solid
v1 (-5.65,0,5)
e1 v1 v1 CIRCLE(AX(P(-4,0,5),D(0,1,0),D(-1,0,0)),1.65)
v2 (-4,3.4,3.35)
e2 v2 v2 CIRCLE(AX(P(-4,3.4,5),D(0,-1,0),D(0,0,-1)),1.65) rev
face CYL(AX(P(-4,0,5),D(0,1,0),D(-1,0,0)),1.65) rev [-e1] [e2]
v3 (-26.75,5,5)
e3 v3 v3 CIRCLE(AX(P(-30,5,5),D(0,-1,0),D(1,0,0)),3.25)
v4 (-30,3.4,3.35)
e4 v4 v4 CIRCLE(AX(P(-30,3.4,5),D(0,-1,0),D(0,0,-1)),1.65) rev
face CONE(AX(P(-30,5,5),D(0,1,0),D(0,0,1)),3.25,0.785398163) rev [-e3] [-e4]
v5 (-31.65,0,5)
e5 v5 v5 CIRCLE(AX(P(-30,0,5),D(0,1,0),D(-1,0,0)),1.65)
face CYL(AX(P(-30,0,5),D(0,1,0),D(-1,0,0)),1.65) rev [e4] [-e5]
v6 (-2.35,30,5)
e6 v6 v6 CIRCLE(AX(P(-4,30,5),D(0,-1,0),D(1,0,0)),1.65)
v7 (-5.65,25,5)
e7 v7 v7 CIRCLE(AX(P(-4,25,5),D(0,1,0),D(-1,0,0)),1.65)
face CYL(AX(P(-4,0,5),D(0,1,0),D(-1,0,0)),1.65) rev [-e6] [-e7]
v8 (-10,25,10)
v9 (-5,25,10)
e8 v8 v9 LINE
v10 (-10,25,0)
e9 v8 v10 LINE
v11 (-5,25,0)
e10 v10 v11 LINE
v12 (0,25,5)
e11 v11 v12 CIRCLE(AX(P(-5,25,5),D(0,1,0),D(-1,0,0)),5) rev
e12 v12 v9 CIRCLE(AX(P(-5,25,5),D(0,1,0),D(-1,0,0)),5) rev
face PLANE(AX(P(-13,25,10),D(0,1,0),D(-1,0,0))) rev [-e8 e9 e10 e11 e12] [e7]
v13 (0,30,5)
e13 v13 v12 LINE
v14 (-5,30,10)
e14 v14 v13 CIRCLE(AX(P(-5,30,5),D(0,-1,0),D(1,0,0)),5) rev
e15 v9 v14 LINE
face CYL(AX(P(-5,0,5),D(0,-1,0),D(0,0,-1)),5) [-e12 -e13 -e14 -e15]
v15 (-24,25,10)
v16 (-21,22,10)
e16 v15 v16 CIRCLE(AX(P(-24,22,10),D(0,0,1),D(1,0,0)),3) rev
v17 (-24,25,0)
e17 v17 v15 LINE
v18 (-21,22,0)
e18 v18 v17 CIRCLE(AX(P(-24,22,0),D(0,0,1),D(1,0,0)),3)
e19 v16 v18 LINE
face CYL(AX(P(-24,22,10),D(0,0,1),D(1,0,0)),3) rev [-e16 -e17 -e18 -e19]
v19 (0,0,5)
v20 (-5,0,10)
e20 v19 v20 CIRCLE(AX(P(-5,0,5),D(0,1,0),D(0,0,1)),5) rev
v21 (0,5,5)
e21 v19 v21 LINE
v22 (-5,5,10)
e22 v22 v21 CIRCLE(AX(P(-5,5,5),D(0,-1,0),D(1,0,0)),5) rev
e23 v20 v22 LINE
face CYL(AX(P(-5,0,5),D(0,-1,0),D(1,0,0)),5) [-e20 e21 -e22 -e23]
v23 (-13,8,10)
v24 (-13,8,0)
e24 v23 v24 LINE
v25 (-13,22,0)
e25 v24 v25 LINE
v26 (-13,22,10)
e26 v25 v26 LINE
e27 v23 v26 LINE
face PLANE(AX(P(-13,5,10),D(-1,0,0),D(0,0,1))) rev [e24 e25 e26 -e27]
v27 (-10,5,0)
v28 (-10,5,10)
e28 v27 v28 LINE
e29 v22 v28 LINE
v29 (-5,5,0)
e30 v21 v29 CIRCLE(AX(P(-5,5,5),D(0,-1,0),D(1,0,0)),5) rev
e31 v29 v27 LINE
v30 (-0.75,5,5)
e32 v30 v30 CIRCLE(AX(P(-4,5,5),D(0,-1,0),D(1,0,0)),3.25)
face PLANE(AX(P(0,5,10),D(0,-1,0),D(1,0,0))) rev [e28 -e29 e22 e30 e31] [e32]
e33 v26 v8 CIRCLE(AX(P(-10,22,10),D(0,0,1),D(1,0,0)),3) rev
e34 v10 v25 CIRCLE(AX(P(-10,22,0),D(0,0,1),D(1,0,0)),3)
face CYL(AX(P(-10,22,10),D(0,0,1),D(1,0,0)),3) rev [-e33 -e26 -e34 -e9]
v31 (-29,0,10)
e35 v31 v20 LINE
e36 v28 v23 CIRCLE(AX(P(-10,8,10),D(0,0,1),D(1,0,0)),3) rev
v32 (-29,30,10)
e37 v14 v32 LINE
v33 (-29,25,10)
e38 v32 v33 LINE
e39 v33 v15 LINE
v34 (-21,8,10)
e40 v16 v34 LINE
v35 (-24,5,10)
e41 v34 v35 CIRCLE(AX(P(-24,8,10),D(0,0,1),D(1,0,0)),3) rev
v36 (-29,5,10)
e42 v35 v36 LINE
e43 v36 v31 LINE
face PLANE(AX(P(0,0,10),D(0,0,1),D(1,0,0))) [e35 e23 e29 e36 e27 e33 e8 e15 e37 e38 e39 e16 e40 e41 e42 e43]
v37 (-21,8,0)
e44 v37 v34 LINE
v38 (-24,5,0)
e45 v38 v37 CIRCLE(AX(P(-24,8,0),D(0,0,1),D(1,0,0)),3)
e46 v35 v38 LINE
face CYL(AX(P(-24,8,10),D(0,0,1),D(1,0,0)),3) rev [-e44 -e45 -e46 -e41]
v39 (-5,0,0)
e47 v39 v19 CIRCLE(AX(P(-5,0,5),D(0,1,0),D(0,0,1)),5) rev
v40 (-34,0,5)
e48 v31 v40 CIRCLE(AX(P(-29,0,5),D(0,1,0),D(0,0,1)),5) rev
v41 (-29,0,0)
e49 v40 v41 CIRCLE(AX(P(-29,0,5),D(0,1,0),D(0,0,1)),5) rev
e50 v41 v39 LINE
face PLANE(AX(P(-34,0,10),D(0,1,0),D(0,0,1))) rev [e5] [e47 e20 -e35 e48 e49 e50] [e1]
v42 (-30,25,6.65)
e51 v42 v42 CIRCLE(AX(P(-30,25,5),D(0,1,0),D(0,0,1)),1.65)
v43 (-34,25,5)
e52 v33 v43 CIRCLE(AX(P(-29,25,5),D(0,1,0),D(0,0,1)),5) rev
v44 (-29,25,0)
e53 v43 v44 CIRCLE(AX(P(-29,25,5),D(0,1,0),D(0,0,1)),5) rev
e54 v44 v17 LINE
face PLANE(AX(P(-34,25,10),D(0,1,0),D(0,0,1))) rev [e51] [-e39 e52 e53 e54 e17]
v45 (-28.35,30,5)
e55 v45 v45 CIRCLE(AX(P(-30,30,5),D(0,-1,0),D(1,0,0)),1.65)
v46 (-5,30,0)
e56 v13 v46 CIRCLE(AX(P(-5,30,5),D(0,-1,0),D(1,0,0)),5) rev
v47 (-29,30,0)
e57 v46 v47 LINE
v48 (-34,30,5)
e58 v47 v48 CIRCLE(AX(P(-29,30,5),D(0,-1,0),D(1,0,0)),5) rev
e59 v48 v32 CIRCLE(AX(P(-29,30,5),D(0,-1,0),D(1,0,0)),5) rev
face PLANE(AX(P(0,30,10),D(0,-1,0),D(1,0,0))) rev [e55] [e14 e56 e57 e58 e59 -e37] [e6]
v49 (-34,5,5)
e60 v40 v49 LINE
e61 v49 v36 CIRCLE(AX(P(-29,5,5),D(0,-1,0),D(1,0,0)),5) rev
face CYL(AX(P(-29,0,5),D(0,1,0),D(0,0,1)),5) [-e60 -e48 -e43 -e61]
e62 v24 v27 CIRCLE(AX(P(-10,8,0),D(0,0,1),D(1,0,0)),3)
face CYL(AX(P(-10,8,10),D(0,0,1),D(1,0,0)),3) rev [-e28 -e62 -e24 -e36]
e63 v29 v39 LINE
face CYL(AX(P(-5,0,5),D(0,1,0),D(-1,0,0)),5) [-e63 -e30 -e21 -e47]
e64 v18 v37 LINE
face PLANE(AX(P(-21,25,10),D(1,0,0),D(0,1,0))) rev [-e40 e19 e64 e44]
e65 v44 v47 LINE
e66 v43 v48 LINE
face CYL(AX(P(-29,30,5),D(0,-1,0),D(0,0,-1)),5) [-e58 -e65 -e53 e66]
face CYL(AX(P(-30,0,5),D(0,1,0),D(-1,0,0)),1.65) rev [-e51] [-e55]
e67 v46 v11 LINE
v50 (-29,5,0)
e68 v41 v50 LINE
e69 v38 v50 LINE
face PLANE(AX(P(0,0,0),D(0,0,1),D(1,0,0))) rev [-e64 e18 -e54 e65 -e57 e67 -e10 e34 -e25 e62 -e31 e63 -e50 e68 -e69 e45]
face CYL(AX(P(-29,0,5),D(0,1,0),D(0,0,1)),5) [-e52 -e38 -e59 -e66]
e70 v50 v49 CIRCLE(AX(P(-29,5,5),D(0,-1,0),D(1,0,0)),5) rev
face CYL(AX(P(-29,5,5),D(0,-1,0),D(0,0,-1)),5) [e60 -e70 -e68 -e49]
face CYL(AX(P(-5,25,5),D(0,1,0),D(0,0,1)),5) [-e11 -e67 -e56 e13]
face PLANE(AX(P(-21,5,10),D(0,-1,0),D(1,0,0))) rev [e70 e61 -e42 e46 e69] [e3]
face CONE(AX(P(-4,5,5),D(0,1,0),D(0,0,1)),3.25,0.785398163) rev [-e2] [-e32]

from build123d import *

# Parameters (mm, degrees)
BOSS_EXTRUDE1_DEPTH     = 10
CUT_EXTRUDE1_DEPTH      = 47.432747065
CUT_EXTRUDE1_DEPTH_BACK = 47.432747065
SKETCH2_R               = 1.65
CHAMFER1_SIZE           = 1.6
FILLET1_R               = 3
FILLET3_R               = 5


with BuildPart() as part:
    # Sketch1 → Boss-Extrude1 (new body)
    with BuildSketch(Plane.XY):
        Polygon((0, 0), (0, 5), (-13, 5), (-13, 25), (0, 25), (0, 30), (-34, 30), (-34, 25), (-21, 25), (-21, 5), (-34, 5), (-34, 0), align=None)
    extrude(amount=BOSS_EXTRUDE1_DEPTH)

    # Sketch2 → Cut-Extrude1 (cut, two sides: drawn at the far end of the back side and taken through both)
    with BuildSketch(Plane(origin=(0, 30, 0), x_dir=(1, 0, 0), z_dir=(0, 1, 0)).offset(-CUT_EXTRUDE1_DEPTH_BACK)):
        with Locations(Location((-30, -5, 0), (0, 0, 180))):
            Circle(SKETCH2_R)
        with Locations(Location((-4, -5, 0), (0, 0, 180))):
            Circle(SKETCH2_R)
    extrude(amount=CUT_EXTRUDE1_DEPTH + CUT_EXTRUDE1_DEPTH_BACK, mode=Mode.SUBTRACT)

    # Chamfer1
    chamfer1_edges = [part.edges().sort_by_distance(p)[0] for p in [
        (-28.35, 5, 5),
        (-2.35, 5, 5),
    ]]
    chamfer(chamfer1_edges, length=CHAMFER1_SIZE)

    # Fillet1
    fillet1_edges = [part.edges().sort_by_distance(p)[0] for p in [
        (-21, 5, 5),
        (-21, 25, 5),
        (-13, 25, 5),
        (-13, 5, 5),
    ]]
    fillet(fillet1_edges, radius=FILLET1_R)

    # Fillet3
    fillet3_edges = [part.edges().sort_by_distance(p)[0] for p in [
        (-34, 2.5, 0),
        (-34, 2.5, 10),
        (0, 2.5, 10),
        (0, 2.5, 0),
        (0, 27.5, 0),
        (0, 27.5, 10),
        (-34, 27.5, 0),
        (-34, 27.5, 10),
    ]]
    fillet(fillet3_edges, radius=FILLET3_R - 0.0001)  # a hair under: the kernel refuses the full size


solid = part.part
